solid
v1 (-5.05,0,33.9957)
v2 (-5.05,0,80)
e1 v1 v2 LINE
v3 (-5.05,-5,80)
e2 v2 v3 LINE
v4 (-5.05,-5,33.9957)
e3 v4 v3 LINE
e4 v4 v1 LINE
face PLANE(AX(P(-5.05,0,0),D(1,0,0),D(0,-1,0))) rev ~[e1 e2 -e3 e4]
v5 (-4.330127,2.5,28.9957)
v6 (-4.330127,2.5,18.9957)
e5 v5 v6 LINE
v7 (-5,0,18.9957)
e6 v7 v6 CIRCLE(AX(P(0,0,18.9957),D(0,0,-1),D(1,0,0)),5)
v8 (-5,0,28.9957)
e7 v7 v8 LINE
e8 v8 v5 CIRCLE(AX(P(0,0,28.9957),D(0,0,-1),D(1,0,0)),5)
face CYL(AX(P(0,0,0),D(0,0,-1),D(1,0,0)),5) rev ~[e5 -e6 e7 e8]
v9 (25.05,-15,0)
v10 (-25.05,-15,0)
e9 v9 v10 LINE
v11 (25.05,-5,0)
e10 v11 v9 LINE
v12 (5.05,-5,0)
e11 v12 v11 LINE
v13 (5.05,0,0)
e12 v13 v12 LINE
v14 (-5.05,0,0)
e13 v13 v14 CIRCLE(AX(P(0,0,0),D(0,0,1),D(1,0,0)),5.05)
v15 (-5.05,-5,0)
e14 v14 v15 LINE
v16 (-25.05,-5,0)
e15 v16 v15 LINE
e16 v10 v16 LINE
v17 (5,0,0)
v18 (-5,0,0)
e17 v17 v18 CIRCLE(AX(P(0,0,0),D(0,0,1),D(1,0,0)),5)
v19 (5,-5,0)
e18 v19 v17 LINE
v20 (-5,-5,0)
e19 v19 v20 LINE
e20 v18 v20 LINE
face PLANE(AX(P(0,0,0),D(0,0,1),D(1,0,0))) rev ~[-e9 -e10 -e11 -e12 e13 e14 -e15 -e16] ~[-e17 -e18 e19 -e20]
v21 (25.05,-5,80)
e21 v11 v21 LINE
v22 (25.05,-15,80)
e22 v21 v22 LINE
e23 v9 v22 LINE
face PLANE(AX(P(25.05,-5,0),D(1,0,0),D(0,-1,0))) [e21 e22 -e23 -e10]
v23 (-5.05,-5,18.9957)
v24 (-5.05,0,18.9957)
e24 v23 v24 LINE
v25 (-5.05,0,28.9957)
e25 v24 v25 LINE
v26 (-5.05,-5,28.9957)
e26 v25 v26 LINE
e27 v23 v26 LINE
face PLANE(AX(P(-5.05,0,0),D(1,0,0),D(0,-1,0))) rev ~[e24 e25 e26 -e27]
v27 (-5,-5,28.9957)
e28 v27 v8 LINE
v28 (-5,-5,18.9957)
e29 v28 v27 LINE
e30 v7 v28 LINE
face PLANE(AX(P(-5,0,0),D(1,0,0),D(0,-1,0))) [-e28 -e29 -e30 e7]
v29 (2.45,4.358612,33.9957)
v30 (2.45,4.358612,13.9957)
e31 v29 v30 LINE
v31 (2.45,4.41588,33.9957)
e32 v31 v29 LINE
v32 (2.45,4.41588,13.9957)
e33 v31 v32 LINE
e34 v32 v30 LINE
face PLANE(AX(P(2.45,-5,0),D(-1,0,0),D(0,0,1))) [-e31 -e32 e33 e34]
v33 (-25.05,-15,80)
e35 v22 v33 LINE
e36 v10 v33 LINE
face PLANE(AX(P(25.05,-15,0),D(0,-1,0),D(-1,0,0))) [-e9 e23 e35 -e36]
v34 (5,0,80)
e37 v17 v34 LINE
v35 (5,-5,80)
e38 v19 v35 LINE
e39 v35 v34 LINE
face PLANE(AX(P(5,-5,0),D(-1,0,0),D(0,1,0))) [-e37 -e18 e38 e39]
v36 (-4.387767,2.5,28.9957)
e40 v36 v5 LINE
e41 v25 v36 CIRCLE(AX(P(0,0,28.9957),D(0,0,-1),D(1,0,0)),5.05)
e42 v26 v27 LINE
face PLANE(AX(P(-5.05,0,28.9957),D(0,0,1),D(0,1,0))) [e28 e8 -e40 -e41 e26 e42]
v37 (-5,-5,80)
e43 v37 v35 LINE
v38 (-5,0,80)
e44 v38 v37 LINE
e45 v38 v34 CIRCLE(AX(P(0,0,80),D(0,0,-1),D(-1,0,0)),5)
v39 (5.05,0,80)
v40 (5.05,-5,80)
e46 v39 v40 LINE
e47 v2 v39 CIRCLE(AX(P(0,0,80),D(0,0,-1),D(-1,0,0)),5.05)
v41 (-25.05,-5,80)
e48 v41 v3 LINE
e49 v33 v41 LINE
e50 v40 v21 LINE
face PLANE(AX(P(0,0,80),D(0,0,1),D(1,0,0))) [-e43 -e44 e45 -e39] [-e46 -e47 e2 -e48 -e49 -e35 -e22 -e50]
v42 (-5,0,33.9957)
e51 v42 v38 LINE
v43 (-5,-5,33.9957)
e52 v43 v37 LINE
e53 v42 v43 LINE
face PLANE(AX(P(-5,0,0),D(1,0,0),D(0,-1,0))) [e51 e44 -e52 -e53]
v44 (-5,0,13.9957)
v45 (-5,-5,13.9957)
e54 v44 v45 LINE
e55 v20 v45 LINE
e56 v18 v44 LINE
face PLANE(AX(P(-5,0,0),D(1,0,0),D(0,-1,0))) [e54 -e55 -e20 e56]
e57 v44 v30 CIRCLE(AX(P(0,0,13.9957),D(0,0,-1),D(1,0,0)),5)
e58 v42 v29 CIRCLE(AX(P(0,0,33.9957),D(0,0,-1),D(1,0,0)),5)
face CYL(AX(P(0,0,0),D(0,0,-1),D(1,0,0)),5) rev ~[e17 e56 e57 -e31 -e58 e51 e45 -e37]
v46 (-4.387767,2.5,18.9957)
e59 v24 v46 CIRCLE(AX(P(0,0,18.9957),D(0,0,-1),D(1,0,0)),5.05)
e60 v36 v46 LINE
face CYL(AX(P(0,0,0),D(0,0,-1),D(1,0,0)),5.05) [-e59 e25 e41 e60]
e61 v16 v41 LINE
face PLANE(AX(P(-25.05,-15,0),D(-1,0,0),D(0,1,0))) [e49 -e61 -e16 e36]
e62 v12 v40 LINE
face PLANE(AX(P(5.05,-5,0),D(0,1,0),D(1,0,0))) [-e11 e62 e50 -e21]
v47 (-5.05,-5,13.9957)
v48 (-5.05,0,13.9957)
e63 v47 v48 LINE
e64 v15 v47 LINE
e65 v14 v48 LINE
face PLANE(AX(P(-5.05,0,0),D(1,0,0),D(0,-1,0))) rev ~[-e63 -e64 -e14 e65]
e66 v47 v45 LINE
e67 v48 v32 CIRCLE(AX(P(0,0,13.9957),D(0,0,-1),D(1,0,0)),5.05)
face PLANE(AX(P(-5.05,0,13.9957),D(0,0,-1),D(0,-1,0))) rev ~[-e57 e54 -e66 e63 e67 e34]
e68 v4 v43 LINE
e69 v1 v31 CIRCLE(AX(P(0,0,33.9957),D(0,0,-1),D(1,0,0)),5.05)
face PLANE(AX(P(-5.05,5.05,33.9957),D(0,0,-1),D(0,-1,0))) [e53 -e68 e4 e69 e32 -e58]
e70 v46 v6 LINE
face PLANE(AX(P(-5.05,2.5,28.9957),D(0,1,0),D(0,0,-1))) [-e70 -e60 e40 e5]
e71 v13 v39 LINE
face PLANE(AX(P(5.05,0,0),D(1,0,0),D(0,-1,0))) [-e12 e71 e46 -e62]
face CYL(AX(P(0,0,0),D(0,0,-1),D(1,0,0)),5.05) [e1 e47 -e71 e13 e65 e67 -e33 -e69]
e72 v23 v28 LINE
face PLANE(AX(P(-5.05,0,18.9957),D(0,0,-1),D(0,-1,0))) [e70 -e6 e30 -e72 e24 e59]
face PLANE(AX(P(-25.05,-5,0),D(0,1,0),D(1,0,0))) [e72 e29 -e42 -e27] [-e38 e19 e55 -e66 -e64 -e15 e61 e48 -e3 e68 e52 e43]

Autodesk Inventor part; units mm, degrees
ref_plane "YZ Plane" through (0, 0, 0) normal (1, 0, 0) x (0, 1, 0)
ref_plane "XZ Plane" through (0, 0, 0) normal (0, 1, 0) x (-1, 0, 0)
ref_plane "XY Plane" through (0, 0, 0) normal (0, 0, 1) x (1, 0, 0)
sketch "эскиз_корпус" plane through (0, 0, 0) normal (0, 0, 1) x (1, 0, 0)
  line L0 (0.9426, 4.9612) -> (-0.95, -5)
  line L1 (-5.05, 0) -> (5.05, 0)
  arc A0 (5.05, 0) -> (-5.05, 0) centre (0, 0) ccw
  line L2 (-5.05, 0) -> (-5.05, -5)
  line L3 (5.05, 0) -> (5.05, -5)
  arc A1 (5, 0) -> (-5, 0) centre (0, 0) ccw
  line L4 (-5.05, -5) -> (-5, -5)
  line L5 (5, -5) -> (5.05, -5)
  line L6 (5.05, -5) -> (25.05, -5)
  line L7 (-25.05, -5) -> (-5.05, -5)
  line L8 (-0.95, -5) -> (5, -5)
  line L9 (-0.95, -5) -> (-5, -5)
  line L10 (5, -5) -> (5, 0)
  line L11 (-5, 0) -> (-5, -5)
  line L12 (25.05, -5) -> (25.05, -15)
  line L13 (25.05, -15) -> (-25.05, -15)
  line L14 (-25.05, -15) -> (-25.05, -5)
  dimension "d33" = 5
  dimension "d34" = 5
  dimension "d52" = 0.05
  dimension "d85" = 10
  dimension "d89" = 20
  dimension "d91" = 20
extrude "корпус_общий" add sketch "эскиз_корпус" along normal blind 80
sketch "эскиз_отверстие_ручка" plane through (-5.05, -5, 0) normal (-1, 0, 0) x (0, 0, 1)
  line L0 (0, 0) -> (80, 0) projected
  line L1 (0, 5) -> (80, 5) projected
  line L2 (13.9957, 20) -> (13.9957, 0)
  line L3 (0, 0) -> (80, 0) projected
  line L4 (13.9957, 20) -> (33.9957, 20)
  line L5 (33.9957, 20) -> (33.9957, 0)
  line L6 (28.9957, 0) -> (28.9957, 7.5)
  line L7 (28.9957, 7.5) -> (18.9957, 7.5)
  line L8 (18.9957, 7.5) -> (18.9957, 0)
  line L9 (0, 5) -> (0, 5) projected
  line L10 (0, 5) -> (80, 5) projected
  line L11 (80, 5) -> (80, 5) projected
  line L12 (0, 5) -> (80, 5) projected
  line L13 (0, 10.05) -> (80, 10.05) projected
  line L14 (0, 5) -> (0, 10.05) projected
  line L15 (80, 5) -> (80, 10.05) projected
  dimension "d77" = 5
  dimension "d78" = 5
  dimension "d79" = 10
  dimension "d87" = 12.5
  dimension "d92" = 20
extrude "отверстие_ручка" cut sketch "эскиз_отверстие_ручка" against normal blind 7.5 contours L2 L1 L8 L0 | L2 L13 L5 L1 L6 L7 L8 | L6 L1 L5 L0 | L2 L4 L5 L13
extrude "отверстие_цилиндр" cut sketch "эскиз_корпус" along normal blind 80 contours A1 L1 L0 | L0 L1 A1 | L1 L10 L8 L0 | L0 L9 L11 L1
equation "\"d33\" = diametr_ruchka_"
equation "\"d34\" = diametr_ruchka_"
equation "\"d85\" = diametr_"
equation "\"d89\" = 2 * diametr_"
equation "\"d91\" = 2 * diametr_"
equation "\"d74\" = length"
equation "\"d77\" = diametr_ruchka_"
equation "\"d78\" = diametr_ruchka_"
equation "\"d79\" = diametr_"
equation "\"d87\" = 2.5 * diametr_ruchka_"
equation "\"d92\" = 2 * diametr_"
equation "\"d81\" = 1.5 * diametr_ruchka_"
equation "\"d83\" = length"
equation "\"diametr_ruchka_\" = 5"
equation "\"diametr_\" = 10"
equation "\"length\" = 80"
properties part number "lw_5_корпус_new"
